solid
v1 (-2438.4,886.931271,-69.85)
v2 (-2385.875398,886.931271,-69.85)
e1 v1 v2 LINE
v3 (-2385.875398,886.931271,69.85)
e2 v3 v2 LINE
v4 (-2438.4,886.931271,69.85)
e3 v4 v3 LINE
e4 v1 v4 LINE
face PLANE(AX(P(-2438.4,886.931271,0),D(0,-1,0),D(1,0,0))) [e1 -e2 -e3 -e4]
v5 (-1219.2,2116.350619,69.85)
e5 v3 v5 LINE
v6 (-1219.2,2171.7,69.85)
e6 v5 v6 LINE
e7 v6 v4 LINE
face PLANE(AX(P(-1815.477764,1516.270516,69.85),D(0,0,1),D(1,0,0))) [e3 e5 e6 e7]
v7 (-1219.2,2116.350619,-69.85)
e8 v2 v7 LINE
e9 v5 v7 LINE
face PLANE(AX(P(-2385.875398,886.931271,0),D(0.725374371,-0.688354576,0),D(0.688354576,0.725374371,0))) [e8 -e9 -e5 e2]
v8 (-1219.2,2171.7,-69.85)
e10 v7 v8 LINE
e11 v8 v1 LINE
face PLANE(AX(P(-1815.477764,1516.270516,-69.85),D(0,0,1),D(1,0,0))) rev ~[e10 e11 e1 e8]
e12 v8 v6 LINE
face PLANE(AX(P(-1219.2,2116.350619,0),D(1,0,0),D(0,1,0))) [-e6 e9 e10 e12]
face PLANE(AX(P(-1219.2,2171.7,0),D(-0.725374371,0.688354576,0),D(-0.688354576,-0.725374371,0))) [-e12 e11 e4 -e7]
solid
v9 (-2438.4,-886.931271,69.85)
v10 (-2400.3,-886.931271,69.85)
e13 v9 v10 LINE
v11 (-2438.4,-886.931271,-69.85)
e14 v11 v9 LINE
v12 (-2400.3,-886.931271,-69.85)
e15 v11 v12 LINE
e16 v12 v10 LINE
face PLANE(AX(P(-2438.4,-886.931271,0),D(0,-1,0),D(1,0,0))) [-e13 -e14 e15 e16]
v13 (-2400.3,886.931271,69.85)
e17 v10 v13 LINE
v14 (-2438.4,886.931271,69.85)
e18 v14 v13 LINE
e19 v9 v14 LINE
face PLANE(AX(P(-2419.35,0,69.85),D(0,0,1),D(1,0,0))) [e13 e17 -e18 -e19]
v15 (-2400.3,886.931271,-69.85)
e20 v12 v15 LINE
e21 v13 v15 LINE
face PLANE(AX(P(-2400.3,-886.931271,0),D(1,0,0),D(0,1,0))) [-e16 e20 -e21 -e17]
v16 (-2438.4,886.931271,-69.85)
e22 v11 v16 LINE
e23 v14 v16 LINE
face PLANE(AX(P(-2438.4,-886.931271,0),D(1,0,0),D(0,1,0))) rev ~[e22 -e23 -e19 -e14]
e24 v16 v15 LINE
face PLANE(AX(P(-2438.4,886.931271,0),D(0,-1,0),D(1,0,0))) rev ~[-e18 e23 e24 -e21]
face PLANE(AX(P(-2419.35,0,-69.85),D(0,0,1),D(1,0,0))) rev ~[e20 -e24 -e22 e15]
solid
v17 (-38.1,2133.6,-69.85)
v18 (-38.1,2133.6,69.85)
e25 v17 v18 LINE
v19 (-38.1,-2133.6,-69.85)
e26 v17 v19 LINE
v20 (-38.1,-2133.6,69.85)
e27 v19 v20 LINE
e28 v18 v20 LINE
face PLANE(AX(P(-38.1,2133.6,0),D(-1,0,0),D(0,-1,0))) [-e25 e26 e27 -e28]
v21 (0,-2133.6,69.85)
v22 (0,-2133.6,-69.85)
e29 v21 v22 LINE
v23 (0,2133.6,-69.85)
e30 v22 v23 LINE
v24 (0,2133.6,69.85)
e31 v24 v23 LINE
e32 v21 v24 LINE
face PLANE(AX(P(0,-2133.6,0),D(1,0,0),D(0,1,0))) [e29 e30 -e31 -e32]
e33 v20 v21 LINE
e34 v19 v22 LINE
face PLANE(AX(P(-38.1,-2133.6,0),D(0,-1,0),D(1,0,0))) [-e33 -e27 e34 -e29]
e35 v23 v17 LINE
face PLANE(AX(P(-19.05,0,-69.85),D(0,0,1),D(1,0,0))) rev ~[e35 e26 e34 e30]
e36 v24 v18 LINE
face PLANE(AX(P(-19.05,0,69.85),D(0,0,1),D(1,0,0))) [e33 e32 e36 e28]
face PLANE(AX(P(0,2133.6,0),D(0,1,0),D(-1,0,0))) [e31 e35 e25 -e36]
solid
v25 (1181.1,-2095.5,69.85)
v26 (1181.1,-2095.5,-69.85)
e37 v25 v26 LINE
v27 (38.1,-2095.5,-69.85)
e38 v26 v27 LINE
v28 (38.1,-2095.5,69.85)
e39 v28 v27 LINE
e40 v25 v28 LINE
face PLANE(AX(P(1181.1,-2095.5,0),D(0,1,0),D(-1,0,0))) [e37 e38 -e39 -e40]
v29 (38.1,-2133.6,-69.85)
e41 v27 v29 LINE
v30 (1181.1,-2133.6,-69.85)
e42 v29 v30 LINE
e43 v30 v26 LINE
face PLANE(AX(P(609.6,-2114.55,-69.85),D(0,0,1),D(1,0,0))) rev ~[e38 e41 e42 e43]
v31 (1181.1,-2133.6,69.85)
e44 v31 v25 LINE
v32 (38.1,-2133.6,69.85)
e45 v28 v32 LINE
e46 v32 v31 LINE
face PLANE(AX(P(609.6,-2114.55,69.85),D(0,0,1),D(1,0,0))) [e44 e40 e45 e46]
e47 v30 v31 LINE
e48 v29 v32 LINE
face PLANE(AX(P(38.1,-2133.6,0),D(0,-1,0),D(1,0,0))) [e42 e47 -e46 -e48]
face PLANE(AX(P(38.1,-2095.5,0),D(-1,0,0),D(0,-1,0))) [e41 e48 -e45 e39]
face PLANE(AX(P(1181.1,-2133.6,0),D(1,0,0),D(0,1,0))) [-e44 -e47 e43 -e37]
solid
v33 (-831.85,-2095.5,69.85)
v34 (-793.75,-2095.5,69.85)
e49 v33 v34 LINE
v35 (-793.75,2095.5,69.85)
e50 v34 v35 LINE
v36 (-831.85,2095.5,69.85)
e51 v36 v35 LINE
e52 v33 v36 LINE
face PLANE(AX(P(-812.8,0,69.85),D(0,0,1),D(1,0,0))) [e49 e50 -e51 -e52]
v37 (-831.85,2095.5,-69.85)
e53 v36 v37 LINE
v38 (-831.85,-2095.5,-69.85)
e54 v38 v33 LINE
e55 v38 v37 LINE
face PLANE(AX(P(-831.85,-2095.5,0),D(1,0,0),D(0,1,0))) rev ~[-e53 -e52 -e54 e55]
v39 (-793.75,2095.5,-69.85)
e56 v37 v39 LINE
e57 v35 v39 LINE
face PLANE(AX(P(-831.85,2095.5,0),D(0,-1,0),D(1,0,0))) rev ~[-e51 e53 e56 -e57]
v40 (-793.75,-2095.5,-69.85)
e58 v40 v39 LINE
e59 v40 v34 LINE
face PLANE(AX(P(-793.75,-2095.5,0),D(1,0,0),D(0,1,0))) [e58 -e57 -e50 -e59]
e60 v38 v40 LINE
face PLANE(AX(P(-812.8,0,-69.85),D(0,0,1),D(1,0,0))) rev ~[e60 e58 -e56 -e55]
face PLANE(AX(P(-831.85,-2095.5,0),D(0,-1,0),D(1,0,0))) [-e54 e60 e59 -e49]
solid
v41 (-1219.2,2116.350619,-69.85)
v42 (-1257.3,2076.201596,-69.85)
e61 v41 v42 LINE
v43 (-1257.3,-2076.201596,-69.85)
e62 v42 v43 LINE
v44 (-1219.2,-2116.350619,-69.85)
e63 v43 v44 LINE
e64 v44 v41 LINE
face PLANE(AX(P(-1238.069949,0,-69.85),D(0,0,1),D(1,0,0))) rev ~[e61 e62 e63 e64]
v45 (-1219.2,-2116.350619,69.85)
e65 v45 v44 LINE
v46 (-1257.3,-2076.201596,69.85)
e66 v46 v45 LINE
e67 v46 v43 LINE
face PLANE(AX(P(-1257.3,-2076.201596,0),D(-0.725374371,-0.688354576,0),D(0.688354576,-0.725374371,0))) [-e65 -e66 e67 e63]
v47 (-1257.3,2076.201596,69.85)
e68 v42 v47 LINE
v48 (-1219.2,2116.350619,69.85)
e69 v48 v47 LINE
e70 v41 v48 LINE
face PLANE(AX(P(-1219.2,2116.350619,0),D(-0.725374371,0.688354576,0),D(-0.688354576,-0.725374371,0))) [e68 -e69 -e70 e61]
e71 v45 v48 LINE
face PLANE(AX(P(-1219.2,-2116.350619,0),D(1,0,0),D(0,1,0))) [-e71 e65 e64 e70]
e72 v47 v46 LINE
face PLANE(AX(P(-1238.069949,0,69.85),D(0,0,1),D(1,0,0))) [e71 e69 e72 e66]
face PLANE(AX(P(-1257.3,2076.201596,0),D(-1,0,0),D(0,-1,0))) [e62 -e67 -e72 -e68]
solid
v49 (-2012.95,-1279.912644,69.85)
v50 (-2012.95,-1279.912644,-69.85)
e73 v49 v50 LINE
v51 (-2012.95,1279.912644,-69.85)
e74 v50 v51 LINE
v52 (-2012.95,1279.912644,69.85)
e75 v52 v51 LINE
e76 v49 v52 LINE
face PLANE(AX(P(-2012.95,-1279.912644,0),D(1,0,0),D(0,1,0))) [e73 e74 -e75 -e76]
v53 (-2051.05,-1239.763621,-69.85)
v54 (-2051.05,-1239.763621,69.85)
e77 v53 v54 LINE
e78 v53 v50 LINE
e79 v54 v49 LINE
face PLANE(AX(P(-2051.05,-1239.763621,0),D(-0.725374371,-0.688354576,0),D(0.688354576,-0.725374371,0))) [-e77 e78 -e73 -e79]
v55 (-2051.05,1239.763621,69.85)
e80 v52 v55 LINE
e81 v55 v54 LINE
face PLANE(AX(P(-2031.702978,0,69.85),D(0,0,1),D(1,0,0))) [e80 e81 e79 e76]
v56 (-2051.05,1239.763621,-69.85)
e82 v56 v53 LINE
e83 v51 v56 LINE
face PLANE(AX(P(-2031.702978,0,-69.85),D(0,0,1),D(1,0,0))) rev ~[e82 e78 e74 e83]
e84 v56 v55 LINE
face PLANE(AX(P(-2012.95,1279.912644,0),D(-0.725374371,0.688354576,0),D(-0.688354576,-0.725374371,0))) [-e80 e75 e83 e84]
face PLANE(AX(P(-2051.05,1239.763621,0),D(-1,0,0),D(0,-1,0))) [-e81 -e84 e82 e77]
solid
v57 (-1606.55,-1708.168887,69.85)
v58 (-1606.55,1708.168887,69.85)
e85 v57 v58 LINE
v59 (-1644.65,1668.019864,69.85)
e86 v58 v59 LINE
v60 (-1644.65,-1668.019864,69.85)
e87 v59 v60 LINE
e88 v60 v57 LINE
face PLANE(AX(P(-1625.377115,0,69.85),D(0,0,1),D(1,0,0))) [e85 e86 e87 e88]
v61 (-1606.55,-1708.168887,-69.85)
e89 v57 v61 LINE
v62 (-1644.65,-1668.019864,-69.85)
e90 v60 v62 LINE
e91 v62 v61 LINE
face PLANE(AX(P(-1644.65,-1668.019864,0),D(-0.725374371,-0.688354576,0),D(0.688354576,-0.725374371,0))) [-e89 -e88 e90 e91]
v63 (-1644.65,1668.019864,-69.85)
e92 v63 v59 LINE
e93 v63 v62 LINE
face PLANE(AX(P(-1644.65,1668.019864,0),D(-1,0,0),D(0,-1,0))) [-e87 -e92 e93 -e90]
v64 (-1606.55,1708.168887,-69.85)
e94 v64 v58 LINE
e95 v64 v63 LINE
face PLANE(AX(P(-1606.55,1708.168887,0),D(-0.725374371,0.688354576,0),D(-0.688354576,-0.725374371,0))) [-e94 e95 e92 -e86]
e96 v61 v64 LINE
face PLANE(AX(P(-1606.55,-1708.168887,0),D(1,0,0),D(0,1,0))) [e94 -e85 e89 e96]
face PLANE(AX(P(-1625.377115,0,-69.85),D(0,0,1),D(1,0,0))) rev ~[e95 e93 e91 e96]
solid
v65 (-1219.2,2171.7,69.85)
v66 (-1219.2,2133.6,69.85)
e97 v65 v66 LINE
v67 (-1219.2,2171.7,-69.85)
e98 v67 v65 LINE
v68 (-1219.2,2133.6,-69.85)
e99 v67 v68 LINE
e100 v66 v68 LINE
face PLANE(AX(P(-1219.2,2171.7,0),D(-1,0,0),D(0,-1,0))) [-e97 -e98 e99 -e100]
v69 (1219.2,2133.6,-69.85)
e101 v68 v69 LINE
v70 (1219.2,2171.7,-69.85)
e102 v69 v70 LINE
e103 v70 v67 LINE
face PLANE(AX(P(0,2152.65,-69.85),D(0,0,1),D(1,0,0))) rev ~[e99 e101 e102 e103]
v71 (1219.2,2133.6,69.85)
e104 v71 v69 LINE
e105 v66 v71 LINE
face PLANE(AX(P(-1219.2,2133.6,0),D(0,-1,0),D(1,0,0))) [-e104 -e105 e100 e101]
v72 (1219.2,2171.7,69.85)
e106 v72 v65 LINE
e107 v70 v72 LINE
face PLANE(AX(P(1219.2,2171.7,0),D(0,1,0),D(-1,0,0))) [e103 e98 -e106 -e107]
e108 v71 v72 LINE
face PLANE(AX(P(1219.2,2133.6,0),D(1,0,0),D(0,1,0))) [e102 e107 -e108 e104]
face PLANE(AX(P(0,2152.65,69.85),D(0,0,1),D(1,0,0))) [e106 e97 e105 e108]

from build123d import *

# Parameters (mm, degrees)
F1_DEPTH = 69.85
F0_W     = 38.1
F0_H     = 4191
F0_H_2   = 1773.8625425149
F2_DEPTH = 69.85
F3_DEPTH = 69.85


with BuildPart() as f1:
    # F0 (on Top) → F1 (new body, symmetric)
    with BuildSketch(Plane.XY):
        Polygon((0, 0), (0, 2133.6), (-38.1, 2133.6), (-38.1, 2095.5), (-38.1, -2095.5), (-38.1, -2133.6), (0, -2133.6), align=None)
    extrude(amount=F1_DEPTH, both=True)


with BuildPart() as f1b:
    # F0 (on Top) → F1, piece 2 (new body, symmetric)
    with BuildSketch(Plane.XY):
        Polygon((387.35, -2095.5), (38.1, -2095.5), (38.1, -2133.6), (1181.1, -2133.6), (1181.1, -2095.5), (831.85, -2095.5), (793.75, -2095.5), (425.45, -2095.5), align=None)
    extrude(amount=F1_DEPTH, both=True)


with BuildPart() as f1c:
    # F0 (on Top) → F1, piece 3 (new body, symmetric)
    with BuildSketch(Plane.XY):
        Polygon((-1219.2, -2116.3506185252), (-1219.2, 2116.3506185252), (-1257.3, 2076.201595752), (-1257.3, -2076.201595752), align=None)
    extrude(amount=F1_DEPTH, both=True)


with BuildPart() as f1d:
    # F0 (on Top) → F1, piece 4 (new body, symmetric)
    with BuildSketch(Plane.XY):
        with Locations((-812.8, 0)):
            Rectangle(F0_W, F0_H)
    extrude(amount=F1_DEPTH, both=True)


with BuildPart() as f1e:
    # F0 (on Top) → F1, piece 5 (new body, symmetric)
    with BuildSketch(Plane.XY):
        with Locations((-2419.35, 0)):
            Rectangle(F0_W, F0_H_2)
    extrude(amount=F1_DEPTH, both=True)


with BuildPart() as f1f:
    # F0 (on Top) → F1, piece 6 (new body, symmetric)
    with BuildSketch(Plane.XY):
        Polygon((-1606.55, -1708.1688869976), (-1606.55, 1708.1688869976), (-1644.65, 1668.0198642244), (-1644.65, -1668.0198642244), align=None)
    extrude(amount=F1_DEPTH, both=True)


with BuildPart() as f1g:
    # F0 (on Top) → F1, piece 7 (new body, symmetric)
    with BuildSketch(Plane.XY):
        Polygon((-2012.95, 1279.9126440834), (-2051.05, 1239.7636213102), (-2051.05, -1239.7636213102), (-2012.95, -1279.9126440834), align=None)
    extrude(amount=F1_DEPTH, both=True)


with BuildPart() as f2:
    # F0 (on Top) → F2 (new body, symmetric)
    with BuildSketch(Plane.XY):
        Polygon((0, 2133.6), (38.1, 2133.6), (1181.1, 2133.6), (1219.2, 2133.6), (1219.2, 2171.7), (-1219.2, 2171.7), (-1219.2, 2133.6), (-1181.1, 2133.6), (-38.1, 2133.6), align=None)
    extrude(amount=F2_DEPTH, both=True)


with BuildPart() as f3:
    # F0 (on Top) → F3 (new body, symmetric)
    with BuildSketch(Plane.XY):
        Polygon((-1219.2, 2116.3506185252), (-1219.2, 2133.6), (-1219.2, 2171.7), (-2438.4, 886.9312712575), (-2400.3, 886.9312712575), (-2385.8753981908, 886.9312712575), (-2051.05, 1239.7636213102), (-2012.95, 1279.9126440834), (-1644.65, 1668.0198642244), (-1606.55, 1708.1688869976), (-1257.3, 2076.201595752), align=None)
    extrude(amount=F3_DEPTH, both=True)


solid = Compound([f1.part, f1b.part, f1c.part, f1d.part, f1e.part, f1f.part, f1g.part, f2.part, f3.part])
